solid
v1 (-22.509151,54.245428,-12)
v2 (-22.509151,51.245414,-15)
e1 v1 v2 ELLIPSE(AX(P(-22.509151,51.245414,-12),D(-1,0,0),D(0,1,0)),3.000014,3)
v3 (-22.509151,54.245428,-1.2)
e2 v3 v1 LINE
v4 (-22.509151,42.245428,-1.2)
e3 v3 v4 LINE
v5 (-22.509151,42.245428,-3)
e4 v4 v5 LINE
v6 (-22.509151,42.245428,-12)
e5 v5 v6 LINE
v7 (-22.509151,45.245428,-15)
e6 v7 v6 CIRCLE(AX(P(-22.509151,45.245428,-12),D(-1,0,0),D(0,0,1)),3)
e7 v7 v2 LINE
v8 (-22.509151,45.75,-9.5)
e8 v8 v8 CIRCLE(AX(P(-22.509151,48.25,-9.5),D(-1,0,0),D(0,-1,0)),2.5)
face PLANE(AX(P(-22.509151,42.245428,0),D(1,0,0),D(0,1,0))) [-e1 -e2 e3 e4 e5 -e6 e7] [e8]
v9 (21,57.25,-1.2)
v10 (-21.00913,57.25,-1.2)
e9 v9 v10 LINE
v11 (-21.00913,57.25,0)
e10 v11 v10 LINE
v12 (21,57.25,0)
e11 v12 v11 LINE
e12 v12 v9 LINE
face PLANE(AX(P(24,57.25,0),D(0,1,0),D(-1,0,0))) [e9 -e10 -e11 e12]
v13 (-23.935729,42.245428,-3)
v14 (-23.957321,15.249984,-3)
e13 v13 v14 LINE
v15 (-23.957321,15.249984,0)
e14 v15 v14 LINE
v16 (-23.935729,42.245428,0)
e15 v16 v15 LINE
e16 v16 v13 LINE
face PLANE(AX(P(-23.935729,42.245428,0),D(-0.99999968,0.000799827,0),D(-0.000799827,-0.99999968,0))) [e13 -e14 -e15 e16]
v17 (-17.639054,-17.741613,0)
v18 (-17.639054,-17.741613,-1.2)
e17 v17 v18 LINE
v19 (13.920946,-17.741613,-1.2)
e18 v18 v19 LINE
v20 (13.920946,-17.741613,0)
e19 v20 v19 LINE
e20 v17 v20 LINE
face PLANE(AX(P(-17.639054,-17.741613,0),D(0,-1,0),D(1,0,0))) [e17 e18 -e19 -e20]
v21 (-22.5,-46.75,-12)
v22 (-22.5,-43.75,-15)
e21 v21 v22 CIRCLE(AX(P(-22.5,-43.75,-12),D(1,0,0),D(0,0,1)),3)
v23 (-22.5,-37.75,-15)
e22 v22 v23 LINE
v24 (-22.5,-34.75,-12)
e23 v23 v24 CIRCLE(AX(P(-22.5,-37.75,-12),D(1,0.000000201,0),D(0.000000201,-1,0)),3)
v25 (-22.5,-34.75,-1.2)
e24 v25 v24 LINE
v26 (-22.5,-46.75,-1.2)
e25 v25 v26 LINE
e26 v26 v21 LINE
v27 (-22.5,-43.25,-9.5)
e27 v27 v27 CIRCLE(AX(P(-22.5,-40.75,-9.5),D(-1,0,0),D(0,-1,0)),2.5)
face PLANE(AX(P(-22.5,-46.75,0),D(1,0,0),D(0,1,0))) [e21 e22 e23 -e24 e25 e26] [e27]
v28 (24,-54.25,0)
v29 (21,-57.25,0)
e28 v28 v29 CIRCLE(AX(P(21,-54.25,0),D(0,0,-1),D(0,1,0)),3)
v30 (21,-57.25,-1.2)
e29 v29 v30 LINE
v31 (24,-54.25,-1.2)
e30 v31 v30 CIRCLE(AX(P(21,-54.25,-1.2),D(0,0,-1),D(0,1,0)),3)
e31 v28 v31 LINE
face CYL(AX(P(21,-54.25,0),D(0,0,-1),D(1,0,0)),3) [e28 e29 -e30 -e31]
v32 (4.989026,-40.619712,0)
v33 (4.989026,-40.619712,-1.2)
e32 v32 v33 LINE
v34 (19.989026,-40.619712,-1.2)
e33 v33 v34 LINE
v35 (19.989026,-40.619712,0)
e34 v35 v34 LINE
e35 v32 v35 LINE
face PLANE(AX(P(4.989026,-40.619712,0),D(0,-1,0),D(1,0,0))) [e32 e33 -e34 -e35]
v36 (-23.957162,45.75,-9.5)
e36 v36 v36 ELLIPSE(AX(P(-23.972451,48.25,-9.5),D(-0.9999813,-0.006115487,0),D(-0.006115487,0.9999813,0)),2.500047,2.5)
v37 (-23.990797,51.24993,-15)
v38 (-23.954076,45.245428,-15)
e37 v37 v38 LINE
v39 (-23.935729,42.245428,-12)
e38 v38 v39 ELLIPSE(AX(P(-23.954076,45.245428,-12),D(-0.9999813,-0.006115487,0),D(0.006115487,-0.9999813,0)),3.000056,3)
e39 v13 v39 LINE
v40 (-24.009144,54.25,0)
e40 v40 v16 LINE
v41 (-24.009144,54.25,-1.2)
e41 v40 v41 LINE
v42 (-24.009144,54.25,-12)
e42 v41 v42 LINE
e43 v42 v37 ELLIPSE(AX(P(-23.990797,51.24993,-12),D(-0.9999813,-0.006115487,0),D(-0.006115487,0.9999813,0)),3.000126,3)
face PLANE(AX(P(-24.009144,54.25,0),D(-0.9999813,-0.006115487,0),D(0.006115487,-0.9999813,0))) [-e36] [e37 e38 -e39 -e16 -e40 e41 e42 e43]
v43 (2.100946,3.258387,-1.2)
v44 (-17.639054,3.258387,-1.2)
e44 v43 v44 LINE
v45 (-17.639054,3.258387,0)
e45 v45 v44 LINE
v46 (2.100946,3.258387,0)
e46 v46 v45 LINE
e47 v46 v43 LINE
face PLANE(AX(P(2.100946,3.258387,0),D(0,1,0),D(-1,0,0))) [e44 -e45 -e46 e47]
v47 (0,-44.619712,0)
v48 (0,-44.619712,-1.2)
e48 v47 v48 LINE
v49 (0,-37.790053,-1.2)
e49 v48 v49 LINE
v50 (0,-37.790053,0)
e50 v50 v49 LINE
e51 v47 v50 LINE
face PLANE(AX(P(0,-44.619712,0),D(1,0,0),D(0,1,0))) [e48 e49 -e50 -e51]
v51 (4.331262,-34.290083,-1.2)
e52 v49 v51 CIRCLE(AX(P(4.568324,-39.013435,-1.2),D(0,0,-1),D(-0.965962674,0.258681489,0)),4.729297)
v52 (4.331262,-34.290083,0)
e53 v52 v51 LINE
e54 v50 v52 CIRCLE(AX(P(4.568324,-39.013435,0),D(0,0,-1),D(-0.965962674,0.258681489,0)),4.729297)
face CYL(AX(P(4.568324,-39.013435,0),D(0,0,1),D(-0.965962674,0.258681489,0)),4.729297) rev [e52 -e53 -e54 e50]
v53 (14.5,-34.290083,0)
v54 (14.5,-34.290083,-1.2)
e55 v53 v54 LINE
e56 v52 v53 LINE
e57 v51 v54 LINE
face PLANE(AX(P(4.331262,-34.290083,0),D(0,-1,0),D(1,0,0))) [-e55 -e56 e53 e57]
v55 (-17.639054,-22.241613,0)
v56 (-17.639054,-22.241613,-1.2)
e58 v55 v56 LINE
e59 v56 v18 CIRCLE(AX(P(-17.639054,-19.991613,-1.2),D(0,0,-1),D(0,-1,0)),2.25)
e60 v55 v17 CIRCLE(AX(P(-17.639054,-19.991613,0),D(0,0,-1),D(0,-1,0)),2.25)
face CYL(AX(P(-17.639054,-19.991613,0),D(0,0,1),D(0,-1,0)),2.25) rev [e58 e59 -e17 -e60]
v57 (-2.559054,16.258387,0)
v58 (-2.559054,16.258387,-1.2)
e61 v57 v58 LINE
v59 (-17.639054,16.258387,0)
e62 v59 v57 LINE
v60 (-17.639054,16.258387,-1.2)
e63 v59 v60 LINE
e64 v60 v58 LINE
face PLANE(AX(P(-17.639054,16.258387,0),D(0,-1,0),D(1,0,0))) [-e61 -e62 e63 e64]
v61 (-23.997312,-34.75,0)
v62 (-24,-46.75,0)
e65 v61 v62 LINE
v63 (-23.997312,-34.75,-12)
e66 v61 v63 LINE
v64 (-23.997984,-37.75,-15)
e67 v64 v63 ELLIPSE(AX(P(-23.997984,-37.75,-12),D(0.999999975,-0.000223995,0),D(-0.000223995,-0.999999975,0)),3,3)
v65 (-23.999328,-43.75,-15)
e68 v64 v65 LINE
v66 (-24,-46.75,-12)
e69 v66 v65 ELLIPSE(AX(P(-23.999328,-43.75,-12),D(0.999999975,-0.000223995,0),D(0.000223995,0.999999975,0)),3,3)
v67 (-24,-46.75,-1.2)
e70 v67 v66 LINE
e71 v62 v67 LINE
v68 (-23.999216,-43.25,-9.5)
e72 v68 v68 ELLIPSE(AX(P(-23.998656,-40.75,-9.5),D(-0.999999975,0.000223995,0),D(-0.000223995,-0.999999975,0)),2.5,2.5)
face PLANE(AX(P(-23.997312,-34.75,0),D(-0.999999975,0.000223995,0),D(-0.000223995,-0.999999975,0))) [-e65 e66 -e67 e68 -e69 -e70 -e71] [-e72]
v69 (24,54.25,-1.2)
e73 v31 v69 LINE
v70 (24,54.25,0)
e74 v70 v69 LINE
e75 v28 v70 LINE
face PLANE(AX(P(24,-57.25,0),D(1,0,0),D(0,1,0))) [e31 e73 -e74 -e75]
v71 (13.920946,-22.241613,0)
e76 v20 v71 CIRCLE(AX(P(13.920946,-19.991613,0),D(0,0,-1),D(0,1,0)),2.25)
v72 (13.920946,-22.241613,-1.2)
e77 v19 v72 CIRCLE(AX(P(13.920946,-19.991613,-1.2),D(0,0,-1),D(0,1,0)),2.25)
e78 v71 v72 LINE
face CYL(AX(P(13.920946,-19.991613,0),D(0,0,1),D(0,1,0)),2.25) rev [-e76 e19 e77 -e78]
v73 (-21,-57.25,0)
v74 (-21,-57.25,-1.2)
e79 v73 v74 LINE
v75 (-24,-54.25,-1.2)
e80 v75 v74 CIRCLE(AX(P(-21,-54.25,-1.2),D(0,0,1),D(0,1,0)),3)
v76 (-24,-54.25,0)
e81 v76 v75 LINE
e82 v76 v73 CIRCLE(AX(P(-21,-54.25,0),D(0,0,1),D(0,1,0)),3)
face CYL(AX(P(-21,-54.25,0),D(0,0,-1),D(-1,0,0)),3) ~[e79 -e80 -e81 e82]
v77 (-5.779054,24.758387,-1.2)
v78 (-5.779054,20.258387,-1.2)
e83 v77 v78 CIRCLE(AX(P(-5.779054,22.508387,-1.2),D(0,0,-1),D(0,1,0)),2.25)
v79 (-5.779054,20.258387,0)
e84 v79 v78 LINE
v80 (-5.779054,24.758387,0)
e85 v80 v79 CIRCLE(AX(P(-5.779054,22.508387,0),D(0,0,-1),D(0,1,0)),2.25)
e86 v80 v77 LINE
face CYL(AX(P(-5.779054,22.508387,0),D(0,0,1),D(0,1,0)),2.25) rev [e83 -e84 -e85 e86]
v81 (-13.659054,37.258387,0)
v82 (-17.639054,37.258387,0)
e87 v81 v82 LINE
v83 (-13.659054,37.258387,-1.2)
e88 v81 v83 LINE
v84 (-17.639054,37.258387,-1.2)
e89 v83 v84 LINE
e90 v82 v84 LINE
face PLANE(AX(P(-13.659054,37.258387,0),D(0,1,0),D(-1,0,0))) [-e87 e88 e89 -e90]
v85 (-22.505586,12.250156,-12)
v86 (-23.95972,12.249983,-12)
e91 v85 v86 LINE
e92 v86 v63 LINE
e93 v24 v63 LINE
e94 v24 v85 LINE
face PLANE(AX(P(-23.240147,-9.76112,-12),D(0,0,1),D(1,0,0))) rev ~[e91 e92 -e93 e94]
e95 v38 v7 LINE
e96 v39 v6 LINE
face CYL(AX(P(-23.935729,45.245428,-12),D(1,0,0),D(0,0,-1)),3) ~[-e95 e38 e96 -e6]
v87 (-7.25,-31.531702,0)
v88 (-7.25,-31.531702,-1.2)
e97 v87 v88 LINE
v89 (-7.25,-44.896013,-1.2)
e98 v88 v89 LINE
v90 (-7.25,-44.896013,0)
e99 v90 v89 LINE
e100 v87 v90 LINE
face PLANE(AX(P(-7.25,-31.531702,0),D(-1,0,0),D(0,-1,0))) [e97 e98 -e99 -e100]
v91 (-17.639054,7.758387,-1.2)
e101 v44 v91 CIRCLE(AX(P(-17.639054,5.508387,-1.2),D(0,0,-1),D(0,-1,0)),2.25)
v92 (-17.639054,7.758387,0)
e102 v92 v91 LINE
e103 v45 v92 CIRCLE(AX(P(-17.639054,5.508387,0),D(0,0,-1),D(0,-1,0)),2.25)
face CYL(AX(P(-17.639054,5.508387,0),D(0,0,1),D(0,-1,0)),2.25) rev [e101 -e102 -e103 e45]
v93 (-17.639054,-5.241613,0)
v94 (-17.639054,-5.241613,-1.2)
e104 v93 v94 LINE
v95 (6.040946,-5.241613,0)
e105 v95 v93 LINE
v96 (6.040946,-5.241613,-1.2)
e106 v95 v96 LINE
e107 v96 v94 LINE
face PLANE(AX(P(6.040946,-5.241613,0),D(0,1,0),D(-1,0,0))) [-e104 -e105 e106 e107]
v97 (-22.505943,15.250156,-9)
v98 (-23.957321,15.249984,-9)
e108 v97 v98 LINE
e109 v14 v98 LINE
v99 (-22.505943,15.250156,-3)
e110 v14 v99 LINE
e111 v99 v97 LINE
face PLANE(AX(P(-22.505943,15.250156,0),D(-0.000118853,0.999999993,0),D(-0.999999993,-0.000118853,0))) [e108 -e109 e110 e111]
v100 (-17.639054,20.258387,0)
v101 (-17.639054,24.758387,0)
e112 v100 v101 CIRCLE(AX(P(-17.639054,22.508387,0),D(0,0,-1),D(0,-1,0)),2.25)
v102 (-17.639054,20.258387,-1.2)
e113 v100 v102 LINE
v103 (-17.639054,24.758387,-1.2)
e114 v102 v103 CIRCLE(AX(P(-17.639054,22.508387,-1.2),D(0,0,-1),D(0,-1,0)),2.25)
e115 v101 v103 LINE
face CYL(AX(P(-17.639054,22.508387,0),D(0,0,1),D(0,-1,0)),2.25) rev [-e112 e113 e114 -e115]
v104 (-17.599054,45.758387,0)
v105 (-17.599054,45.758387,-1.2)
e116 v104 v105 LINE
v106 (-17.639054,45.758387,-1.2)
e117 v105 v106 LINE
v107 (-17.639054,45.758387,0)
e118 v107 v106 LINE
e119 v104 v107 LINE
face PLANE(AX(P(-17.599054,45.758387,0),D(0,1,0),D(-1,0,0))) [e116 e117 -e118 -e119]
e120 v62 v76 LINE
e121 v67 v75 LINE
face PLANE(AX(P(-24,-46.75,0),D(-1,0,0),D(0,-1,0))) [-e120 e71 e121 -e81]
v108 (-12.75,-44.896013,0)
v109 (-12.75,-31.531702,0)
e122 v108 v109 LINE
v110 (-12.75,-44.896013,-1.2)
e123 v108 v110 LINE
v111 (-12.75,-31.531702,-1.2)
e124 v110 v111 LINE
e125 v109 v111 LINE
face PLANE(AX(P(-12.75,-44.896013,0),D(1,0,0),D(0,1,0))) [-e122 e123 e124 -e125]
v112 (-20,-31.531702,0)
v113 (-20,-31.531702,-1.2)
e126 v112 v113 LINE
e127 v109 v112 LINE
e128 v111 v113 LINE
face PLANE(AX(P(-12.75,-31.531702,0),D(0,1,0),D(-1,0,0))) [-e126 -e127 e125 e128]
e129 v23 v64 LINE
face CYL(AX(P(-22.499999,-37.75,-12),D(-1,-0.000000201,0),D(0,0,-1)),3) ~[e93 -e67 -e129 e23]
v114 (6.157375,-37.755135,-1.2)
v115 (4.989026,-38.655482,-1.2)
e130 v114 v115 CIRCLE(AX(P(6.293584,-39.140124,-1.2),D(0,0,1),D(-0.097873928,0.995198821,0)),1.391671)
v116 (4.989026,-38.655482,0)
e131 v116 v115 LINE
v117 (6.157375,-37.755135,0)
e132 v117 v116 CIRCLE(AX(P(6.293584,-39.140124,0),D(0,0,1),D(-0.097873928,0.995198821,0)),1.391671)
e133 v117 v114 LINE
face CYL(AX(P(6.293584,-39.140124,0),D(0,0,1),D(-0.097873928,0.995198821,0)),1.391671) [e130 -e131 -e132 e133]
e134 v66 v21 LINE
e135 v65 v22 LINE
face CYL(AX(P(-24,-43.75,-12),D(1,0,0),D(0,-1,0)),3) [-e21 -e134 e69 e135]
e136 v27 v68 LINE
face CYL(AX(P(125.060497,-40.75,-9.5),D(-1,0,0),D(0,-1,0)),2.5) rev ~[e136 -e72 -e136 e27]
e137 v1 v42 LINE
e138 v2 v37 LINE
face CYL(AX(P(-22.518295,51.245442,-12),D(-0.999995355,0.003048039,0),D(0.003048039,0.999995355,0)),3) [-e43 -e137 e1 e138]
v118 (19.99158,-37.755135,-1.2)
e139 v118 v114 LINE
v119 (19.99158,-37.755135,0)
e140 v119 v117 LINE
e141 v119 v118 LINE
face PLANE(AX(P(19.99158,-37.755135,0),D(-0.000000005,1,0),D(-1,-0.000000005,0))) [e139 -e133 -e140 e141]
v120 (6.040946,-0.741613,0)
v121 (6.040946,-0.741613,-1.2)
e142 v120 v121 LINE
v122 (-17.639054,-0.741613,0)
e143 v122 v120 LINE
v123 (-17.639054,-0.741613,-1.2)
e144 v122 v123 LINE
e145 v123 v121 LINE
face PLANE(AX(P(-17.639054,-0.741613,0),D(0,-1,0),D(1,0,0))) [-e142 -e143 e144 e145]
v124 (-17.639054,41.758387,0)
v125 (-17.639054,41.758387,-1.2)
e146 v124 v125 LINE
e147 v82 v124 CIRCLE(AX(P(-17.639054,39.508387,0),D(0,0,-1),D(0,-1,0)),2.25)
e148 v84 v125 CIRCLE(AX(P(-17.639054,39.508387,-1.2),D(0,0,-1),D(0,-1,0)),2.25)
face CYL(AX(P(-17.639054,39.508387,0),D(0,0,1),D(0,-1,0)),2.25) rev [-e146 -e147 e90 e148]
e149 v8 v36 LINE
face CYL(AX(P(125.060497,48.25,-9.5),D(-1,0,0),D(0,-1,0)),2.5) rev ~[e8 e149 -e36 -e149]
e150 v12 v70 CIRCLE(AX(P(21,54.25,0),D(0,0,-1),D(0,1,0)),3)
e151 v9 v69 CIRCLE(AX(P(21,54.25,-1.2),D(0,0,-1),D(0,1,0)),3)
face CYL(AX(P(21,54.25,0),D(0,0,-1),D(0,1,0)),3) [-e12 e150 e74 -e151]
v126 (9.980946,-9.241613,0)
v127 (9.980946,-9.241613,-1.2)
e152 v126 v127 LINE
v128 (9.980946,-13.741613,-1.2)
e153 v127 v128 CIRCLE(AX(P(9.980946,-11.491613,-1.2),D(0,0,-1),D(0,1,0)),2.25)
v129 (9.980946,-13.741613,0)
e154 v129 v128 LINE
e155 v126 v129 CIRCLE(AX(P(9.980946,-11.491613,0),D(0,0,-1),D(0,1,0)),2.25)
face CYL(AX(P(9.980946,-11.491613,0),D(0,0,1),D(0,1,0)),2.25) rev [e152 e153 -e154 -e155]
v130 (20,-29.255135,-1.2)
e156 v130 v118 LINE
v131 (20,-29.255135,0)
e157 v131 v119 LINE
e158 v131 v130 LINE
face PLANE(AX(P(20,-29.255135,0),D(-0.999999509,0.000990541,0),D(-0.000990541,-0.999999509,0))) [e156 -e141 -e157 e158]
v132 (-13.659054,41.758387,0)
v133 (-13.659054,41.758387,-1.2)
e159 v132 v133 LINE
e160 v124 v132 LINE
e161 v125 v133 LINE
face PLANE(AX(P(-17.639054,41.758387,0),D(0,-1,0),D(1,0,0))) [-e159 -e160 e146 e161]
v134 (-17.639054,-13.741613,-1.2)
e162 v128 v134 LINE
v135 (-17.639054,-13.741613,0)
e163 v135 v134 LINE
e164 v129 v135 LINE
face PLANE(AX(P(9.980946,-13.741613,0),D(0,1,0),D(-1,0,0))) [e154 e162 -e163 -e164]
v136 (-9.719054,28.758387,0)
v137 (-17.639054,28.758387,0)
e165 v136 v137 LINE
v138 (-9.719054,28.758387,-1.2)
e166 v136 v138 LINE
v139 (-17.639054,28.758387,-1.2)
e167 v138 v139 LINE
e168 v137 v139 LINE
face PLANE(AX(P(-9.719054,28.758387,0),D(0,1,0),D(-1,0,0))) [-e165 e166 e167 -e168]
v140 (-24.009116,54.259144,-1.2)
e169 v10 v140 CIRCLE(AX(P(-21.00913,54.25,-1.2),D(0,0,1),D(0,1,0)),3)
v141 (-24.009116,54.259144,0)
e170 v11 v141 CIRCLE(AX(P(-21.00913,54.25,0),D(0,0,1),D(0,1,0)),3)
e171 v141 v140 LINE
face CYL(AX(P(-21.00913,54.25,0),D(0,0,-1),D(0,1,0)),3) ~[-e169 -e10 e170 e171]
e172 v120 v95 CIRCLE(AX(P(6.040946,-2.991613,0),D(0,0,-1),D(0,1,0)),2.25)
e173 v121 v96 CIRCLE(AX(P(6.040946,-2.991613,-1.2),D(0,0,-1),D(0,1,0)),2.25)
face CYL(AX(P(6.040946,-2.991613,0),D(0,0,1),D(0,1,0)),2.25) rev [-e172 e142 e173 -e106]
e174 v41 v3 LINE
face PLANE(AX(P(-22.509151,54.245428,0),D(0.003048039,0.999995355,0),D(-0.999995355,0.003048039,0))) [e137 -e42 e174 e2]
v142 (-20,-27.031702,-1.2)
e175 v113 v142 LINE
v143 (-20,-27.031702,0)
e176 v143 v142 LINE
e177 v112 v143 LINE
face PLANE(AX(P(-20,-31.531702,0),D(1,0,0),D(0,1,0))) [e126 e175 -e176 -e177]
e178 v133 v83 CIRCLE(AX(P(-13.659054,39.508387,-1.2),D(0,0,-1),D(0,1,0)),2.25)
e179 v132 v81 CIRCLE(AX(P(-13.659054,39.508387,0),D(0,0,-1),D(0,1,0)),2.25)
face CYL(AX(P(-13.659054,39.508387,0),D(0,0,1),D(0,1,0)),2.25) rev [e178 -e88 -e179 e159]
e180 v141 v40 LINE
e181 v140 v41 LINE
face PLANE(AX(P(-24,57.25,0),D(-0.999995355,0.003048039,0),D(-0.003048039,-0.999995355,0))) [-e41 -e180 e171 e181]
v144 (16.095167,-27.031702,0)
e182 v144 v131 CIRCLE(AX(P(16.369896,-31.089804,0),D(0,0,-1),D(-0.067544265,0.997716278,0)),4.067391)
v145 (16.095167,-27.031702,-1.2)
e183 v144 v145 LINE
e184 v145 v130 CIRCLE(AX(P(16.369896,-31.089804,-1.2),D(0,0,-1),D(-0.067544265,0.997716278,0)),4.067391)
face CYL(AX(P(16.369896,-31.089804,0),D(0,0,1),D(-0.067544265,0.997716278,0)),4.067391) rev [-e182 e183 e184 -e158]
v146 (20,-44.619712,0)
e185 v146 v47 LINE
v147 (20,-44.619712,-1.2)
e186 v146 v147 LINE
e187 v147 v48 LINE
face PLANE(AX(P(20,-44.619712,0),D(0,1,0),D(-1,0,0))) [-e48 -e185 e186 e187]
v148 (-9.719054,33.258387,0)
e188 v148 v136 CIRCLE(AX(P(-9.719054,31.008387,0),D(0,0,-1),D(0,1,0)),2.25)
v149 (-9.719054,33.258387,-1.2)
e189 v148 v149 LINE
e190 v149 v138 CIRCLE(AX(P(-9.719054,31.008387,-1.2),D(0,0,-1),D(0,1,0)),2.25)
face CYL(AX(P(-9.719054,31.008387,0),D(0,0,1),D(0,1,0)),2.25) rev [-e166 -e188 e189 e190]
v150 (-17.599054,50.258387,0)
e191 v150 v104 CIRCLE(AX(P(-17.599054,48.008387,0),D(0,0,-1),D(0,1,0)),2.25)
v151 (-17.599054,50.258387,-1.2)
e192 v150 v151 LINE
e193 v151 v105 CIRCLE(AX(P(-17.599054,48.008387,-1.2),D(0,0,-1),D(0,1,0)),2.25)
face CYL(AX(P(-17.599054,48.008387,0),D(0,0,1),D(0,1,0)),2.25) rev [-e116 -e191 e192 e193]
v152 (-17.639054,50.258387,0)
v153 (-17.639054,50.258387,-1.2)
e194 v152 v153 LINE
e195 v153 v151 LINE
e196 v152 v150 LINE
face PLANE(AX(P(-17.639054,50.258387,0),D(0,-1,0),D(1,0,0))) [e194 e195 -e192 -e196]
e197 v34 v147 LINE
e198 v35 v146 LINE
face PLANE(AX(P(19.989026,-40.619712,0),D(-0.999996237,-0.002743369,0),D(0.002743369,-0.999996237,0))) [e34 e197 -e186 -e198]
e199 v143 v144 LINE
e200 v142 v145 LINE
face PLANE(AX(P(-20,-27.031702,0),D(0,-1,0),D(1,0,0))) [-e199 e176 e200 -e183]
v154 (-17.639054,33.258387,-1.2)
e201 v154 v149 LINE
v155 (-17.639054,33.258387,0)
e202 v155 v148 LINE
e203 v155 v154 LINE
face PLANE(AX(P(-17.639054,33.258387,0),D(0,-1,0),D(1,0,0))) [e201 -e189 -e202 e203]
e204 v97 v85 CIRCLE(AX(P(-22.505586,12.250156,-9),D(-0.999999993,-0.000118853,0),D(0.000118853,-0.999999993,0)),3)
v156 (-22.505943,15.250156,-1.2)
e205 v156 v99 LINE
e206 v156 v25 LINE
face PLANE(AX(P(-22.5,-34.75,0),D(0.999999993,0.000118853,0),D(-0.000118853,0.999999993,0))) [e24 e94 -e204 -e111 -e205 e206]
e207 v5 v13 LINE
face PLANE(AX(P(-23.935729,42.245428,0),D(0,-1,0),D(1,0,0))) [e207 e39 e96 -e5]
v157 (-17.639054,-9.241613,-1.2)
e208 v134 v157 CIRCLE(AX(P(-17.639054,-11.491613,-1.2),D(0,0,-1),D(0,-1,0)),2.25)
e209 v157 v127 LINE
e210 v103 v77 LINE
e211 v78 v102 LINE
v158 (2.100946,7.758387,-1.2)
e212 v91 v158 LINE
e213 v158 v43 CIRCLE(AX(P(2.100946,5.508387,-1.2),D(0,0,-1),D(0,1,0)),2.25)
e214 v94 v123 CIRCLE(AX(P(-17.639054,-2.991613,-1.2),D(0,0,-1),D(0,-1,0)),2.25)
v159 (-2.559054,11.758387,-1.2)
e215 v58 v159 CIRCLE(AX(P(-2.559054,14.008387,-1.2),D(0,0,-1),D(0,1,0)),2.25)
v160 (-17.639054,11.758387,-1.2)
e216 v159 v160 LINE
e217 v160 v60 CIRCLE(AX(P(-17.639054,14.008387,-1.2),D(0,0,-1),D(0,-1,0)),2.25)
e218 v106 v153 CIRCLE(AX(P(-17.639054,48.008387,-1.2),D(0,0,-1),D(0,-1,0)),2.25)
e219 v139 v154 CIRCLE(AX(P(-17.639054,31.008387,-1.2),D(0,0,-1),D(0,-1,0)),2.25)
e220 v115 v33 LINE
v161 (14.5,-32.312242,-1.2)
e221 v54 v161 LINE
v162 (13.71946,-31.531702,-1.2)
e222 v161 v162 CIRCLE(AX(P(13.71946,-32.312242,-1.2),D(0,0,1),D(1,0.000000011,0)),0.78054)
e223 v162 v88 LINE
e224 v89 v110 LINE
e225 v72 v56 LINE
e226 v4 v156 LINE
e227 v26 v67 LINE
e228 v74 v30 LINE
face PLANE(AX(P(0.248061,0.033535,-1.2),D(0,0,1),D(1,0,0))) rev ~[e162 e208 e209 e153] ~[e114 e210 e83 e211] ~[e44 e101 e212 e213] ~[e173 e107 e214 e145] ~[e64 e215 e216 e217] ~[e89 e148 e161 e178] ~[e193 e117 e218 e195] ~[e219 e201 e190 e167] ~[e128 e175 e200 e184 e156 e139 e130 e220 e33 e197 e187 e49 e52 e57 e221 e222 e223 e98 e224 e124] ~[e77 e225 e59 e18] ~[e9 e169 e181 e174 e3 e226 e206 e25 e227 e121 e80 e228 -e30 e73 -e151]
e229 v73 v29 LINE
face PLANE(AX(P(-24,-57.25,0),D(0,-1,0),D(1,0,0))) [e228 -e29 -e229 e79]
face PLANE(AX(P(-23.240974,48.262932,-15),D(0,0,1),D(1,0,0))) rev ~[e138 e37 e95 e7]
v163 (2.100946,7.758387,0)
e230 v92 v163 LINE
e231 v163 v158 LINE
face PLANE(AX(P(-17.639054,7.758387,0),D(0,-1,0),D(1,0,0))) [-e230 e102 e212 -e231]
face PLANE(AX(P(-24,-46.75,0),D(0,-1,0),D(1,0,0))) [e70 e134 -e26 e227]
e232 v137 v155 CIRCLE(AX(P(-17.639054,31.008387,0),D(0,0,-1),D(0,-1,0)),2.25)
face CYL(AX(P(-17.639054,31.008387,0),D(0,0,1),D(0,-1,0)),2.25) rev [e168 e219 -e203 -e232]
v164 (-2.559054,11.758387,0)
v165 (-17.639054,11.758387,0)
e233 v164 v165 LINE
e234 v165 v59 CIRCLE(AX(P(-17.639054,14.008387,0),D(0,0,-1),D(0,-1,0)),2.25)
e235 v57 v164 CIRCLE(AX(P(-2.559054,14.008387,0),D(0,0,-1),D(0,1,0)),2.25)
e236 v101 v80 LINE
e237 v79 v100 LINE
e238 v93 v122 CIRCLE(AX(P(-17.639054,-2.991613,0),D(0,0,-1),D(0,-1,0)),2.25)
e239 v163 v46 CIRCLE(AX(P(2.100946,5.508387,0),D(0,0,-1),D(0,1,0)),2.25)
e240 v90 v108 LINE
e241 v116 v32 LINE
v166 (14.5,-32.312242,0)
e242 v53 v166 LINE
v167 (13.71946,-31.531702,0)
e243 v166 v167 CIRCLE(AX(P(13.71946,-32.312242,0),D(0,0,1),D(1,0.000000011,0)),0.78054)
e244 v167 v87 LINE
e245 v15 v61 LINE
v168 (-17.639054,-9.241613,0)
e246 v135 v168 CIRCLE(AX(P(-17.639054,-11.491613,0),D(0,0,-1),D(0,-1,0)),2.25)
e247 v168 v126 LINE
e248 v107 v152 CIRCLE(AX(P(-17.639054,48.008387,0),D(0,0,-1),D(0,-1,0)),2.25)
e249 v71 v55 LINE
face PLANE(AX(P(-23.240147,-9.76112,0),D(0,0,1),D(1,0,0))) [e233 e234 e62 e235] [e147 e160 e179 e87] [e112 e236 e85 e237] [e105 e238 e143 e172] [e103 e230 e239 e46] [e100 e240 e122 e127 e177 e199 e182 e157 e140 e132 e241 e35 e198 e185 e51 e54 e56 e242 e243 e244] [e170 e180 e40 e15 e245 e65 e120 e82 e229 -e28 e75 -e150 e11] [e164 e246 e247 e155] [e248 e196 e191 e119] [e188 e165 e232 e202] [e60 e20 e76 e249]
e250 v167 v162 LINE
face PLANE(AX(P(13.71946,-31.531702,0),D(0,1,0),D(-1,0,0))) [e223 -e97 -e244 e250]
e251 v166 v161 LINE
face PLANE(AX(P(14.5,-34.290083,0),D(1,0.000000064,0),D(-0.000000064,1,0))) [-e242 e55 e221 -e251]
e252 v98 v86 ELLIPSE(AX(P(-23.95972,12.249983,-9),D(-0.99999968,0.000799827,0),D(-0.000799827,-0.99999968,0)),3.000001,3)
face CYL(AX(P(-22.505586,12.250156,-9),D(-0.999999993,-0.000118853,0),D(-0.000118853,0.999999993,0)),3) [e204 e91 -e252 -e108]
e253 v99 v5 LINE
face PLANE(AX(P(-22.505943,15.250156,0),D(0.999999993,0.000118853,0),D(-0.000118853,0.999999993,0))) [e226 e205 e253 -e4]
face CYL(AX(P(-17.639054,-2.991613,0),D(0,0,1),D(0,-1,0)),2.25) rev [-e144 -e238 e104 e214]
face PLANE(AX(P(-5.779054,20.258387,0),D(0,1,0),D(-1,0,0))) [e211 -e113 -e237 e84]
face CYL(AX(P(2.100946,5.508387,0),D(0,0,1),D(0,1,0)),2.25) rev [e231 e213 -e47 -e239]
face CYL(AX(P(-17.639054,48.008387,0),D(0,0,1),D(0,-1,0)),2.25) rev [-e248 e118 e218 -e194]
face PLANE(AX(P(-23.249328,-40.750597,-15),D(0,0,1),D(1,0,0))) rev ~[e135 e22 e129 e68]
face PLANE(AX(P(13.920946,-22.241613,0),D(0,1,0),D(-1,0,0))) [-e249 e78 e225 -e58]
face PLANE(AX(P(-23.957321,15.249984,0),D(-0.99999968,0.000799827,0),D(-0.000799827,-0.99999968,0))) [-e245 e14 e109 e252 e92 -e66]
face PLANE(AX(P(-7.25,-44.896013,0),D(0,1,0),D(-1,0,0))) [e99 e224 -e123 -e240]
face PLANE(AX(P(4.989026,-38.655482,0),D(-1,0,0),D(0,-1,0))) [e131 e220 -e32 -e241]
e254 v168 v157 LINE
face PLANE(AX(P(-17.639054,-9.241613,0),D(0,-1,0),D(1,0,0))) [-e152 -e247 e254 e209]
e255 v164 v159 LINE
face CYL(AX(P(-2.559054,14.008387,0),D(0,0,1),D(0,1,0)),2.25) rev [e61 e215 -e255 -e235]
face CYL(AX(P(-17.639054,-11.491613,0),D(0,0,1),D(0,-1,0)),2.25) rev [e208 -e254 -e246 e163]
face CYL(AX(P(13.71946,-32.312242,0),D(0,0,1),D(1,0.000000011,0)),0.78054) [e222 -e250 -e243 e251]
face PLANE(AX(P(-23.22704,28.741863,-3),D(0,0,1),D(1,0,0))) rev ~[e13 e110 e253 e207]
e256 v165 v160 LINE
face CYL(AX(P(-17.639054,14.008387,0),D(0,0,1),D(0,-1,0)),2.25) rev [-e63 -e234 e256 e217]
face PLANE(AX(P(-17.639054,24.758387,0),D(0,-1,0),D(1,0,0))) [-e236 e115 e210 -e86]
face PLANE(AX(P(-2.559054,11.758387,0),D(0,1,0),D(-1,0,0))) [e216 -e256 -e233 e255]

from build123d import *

# Parameters (mm, degrees)
F1_DEPTH = 1.2
F2_DEPTH = 15
F4_D     = 5
F5_R     = 3
F6_DEPTH = 3
F7_DEPTH = 12
F8_R     = 3


# Not quite as in the source:
# - a feature names something its author has since deleted; it is built from what else it names


with BuildPart() as f1:
    # F0 (on Top) → F1 (new body)
    with BuildSketch(Plane.XY):
        Polygon((24, 57.25), (-24, 57.25), (-24.0091441598, 54.25), (-22.5091511277, 54.2454279414), (-22.5091511277, 42.2454279414), (-22.5059426621, 15.2501562063), (-22.5, -34.75), (-22.5, -46.75), (-24, -46.75), (-24, -57.25), (24, -57.25), align=None)
        with BuildLine():
            Line((13.9209458456, -22.2416133583), (-17.6390541544, -22.2416133583))
            ThreePointArc((-17.6390541544, -22.2416133583), (-19.8890541544, -19.9916133583), (-17.6390541544, -17.7416133583))
            Line((-17.6390541544, -17.7416133583), (13.9209458456, -17.7416133583))
            ThreePointArc((13.9209458456, -17.7416133583), (16.1709458456, -19.9916133583), (13.9209458456, -22.2416133583))
        make_face(mode=Mode.SUBTRACT)
        with BuildLine():
            Line((9.9809458456, -13.7416133583), (-17.6390541544, -13.7416133583))
            ThreePointArc((-17.6390541544, -13.7416133583), (-19.8890541544, -11.4916133583), (-17.6390541544, -9.2416133583))
            Line((-17.6390541544, -9.2416133583), (9.9809458456, -9.2416133583))
            ThreePointArc((9.9809458456, -9.2416133583), (12.2309458456, -11.4916133583), (9.9809458456, -13.7416133583))
        make_face(mode=Mode.SUBTRACT)
        with BuildLine():
            Line((6.0409458456, -5.2416133583), (-17.6390541544, -5.2416133583))
            ThreePointArc((-17.6390541544, -5.2416133583), (-19.8890541544, -2.9916133583), (-17.6390541544, -0.7416133583))
            Line((-17.6390541544, -0.7416133583), (6.0409458456, -0.7416133583))
            ThreePointArc((6.0409458456, -0.7416133583), (8.2909458456, -2.9916133583), (6.0409458456, -5.2416133583))
        make_face(mode=Mode.SUBTRACT)
        with BuildLine():
            Line((-19.9999999992, -31.5317022603), (-19.9999999992, -27.0317022603))
            Line((-19.9999999992, -27.0317022603), (16.0951670268, -27.0317022603))
            ThreePointArc((16.0951670268, -27.0317022603), (18.3824934665, -27.555243649), (19.9999999704, -29.25513498))
            Line((19.9999999704, -29.25513498), (19.991580365, -37.75513498))
            Line((19.991580365, -37.75513498), (6.1573753969, -37.7551350426))
            ThreePointArc((6.1573753969, -37.7551350426), (5.4441089744, -38.037790108), (4.9890264818, -38.6554816172))
            Line((4.9890264818, -38.6554816172), (4.9890264818, -40.6197120801))
            Line((4.9890264818, -40.6197120801), (19.9890264818, -40.6197120801))
            Line((19.9890264818, -40.6197120801), (20, -44.6197120801))
            Line((20, -44.6197120801), (0, -44.6197120801))
            Line((0, -44.6197120801), (0, -37.7900532508))
            ThreePointArc((0, -37.7900532508), (1.5958871284, -35.3350022858), (4.3312619815, -34.2900834468))
            Line((4.3312619815, -34.2900834468), (14.5000001306, -34.2900834468))
            Line((14.5000001306, -34.2900834468), (14.5000000048, -32.3122422563))
            ThreePointArc((14.5000000048, -32.3122422563), (14.2713851276, -31.7603171319), (13.7194600008, -31.5317022603))
            Line((13.7194600008, -31.5317022603), (-7.2499999992, -31.5317022603))
            Line((-7.2499999992, -31.5317022603), (-7.2499999992, -44.8960133593))
            Line((-7.2499999992, -44.8960133593), (-12.7499999992, -44.8960133593))
            Line((-12.7499999992, -44.8960133593), (-12.7499999992, -31.5317022603))
            Line((-12.7499999992, -31.5317022603), (-19.9999999992, -31.5317022603))
        make_face(mode=Mode.SUBTRACT)
        with BuildLine():
            Line((2.1009458456, 3.2583866417), (-17.6390541544, 3.2583866417))
            ThreePointArc((-17.6390541544, 3.2583866417), (-19.8890541544, 5.5083866417), (-17.6390541544, 7.7583866417))
            Line((-17.6390541544, 7.7583866417), (2.1009458456, 7.7583866417))
            ThreePointArc((2.1009458456, 7.7583866417), (4.3509458456, 5.5083866417), (2.1009458456, 3.2583866417))
        make_face(mode=Mode.SUBTRACT)
        with BuildLine():
            Line((-2.5590541544, 11.7583866417), (-17.6390541544, 11.7583866417))
            ThreePointArc((-17.6390541544, 11.7583866417), (-19.8890541544, 14.0083866417), (-17.6390541544, 16.2583866417))
            Line((-17.6390541544, 16.2583866417), (-2.5590541544, 16.2583866417))
            ThreePointArc((-2.5590541544, 16.2583866417), (-0.3090541544, 14.0083866417), (-2.5590541544, 11.7583866417))
        make_face(mode=Mode.SUBTRACT)
        with BuildLine():
            Line((-5.7790541544, 20.2583866417), (-17.6390541544, 20.2583866417))
            ThreePointArc((-17.6390541544, 20.2583866417), (-19.8890541544, 22.5083866417), (-17.6390541544, 24.7583866417))
            Line((-17.6390541544, 24.7583866417), (-5.7790541544, 24.7583866417))
            ThreePointArc((-5.7790541544, 24.7583866417), (-3.5290541544, 22.5083866417), (-5.7790541544, 20.2583866417))
        make_face(mode=Mode.SUBTRACT)
        with BuildLine():
            Line((-9.7190541544, 28.7583866417), (-17.6390541544, 28.7583866417))
            ThreePointArc((-17.6390541544, 28.7583866417), (-19.8890541544, 31.0083866417), (-17.6390541544, 33.2583866417))
            Line((-17.6390541544, 33.2583866417), (-9.7190541544, 33.2583866417))
            ThreePointArc((-9.7190541544, 33.2583866417), (-7.4690541544, 31.0083866417), (-9.7190541544, 28.7583866417))
        make_face(mode=Mode.SUBTRACT)
        with BuildLine():
            Line((-13.6590541544, 37.2583866417), (-17.6390541544, 37.2583866417))
            ThreePointArc((-17.6390541544, 37.2583866417), (-19.8890541544, 39.5083866417), (-17.6390541544, 41.7583866417))
            Line((-17.6390541544, 41.7583866417), (-13.6590541544, 41.7583866417))
            ThreePointArc((-13.6590541544, 41.7583866417), (-11.4090541544, 39.5083866417), (-13.6590541544, 37.2583866417))
        make_face(mode=Mode.SUBTRACT)
        with BuildLine():
            Line((-17.5990541544, 45.7583866417), (-17.6390541544, 45.7583866417))
            ThreePointArc((-17.6390541544, 45.7583866417), (-19.8890541544, 48.0083866417), (-17.6390541544, 50.2583866417))
            Line((-17.6390541544, 50.2583866417), (-17.5990541544, 50.2583866417))
            ThreePointArc((-17.5990541544, 50.2583866417), (-15.3490541544, 48.0083866417), (-17.5990541544, 45.7583866417))
        make_face(mode=Mode.SUBTRACT)
    extrude(amount=-F1_DEPTH)

    # F0 (on Top) → F2 (join)
    with BuildSketch(Plane.XY):
        Polygon((-22.5091511277, 54.2454279414), (-24.0091441598, 54.25), (-23.9357289877, 42.2454279414), (-22.5091511277, 42.2454279414), align=None)
        Polygon((-23.997312058, -34.750000301), (-24, -46.75), (-22.5, -46.75), (-22.5, -34.75), align=None)
    extrude(amount=-F2_DEPTH)

    # F4 (through all)
    with Locations(Plane.YZ):
        with Locations((-40.75, -9.5), (48.25, -9.5)):
            Hole(F4_D / 2)

    # F5
    f5_edges = [f1.edges().sort_by_distance(p)[0] for p in [
        (-23.22244, 42.245428, -15),
        (-23.259148, 54.247714, -15),
        (-23.248656, -34.75, -15),
        (-23.25, -46.75, -15),
    ]]
    fillet(f5_edges, radius=F5_R)

    # F0 (on Top) → F6 (join)
    with BuildSketch(Plane.XY):
        Polygon((-22.5091511277, 42.2454279414), (-23.9357289877, 42.2454279414), (-23.9573206897, 15.2499837059), (-22.5059426621, 15.2501562063), align=None)
    extrude(amount=-F6_DEPTH)

    # F0 (on Top) → F7 (join)
    with BuildSketch(Plane.XY):
        Polygon((-22.5059426621, 15.2501562063), (-23.9573206897, 15.2499837059), (-23.997312058, -34.750000301), (-22.5, -34.75), align=None)
    extrude(amount=-F7_DEPTH)

    # F8
    f8_edges = [f1.edges().sort_by_distance(p)[0] for p in [
        (-23.231632, 15.25007, -12),
        (24, 57.25, -0.6),
        (-24, 57.25, -0.6),
        (-24, -57.25, -0.6),
        (24, -57.25, -0.6),
    ]]
    fillet(f8_edges, radius=F8_R)


solid = f1.part
